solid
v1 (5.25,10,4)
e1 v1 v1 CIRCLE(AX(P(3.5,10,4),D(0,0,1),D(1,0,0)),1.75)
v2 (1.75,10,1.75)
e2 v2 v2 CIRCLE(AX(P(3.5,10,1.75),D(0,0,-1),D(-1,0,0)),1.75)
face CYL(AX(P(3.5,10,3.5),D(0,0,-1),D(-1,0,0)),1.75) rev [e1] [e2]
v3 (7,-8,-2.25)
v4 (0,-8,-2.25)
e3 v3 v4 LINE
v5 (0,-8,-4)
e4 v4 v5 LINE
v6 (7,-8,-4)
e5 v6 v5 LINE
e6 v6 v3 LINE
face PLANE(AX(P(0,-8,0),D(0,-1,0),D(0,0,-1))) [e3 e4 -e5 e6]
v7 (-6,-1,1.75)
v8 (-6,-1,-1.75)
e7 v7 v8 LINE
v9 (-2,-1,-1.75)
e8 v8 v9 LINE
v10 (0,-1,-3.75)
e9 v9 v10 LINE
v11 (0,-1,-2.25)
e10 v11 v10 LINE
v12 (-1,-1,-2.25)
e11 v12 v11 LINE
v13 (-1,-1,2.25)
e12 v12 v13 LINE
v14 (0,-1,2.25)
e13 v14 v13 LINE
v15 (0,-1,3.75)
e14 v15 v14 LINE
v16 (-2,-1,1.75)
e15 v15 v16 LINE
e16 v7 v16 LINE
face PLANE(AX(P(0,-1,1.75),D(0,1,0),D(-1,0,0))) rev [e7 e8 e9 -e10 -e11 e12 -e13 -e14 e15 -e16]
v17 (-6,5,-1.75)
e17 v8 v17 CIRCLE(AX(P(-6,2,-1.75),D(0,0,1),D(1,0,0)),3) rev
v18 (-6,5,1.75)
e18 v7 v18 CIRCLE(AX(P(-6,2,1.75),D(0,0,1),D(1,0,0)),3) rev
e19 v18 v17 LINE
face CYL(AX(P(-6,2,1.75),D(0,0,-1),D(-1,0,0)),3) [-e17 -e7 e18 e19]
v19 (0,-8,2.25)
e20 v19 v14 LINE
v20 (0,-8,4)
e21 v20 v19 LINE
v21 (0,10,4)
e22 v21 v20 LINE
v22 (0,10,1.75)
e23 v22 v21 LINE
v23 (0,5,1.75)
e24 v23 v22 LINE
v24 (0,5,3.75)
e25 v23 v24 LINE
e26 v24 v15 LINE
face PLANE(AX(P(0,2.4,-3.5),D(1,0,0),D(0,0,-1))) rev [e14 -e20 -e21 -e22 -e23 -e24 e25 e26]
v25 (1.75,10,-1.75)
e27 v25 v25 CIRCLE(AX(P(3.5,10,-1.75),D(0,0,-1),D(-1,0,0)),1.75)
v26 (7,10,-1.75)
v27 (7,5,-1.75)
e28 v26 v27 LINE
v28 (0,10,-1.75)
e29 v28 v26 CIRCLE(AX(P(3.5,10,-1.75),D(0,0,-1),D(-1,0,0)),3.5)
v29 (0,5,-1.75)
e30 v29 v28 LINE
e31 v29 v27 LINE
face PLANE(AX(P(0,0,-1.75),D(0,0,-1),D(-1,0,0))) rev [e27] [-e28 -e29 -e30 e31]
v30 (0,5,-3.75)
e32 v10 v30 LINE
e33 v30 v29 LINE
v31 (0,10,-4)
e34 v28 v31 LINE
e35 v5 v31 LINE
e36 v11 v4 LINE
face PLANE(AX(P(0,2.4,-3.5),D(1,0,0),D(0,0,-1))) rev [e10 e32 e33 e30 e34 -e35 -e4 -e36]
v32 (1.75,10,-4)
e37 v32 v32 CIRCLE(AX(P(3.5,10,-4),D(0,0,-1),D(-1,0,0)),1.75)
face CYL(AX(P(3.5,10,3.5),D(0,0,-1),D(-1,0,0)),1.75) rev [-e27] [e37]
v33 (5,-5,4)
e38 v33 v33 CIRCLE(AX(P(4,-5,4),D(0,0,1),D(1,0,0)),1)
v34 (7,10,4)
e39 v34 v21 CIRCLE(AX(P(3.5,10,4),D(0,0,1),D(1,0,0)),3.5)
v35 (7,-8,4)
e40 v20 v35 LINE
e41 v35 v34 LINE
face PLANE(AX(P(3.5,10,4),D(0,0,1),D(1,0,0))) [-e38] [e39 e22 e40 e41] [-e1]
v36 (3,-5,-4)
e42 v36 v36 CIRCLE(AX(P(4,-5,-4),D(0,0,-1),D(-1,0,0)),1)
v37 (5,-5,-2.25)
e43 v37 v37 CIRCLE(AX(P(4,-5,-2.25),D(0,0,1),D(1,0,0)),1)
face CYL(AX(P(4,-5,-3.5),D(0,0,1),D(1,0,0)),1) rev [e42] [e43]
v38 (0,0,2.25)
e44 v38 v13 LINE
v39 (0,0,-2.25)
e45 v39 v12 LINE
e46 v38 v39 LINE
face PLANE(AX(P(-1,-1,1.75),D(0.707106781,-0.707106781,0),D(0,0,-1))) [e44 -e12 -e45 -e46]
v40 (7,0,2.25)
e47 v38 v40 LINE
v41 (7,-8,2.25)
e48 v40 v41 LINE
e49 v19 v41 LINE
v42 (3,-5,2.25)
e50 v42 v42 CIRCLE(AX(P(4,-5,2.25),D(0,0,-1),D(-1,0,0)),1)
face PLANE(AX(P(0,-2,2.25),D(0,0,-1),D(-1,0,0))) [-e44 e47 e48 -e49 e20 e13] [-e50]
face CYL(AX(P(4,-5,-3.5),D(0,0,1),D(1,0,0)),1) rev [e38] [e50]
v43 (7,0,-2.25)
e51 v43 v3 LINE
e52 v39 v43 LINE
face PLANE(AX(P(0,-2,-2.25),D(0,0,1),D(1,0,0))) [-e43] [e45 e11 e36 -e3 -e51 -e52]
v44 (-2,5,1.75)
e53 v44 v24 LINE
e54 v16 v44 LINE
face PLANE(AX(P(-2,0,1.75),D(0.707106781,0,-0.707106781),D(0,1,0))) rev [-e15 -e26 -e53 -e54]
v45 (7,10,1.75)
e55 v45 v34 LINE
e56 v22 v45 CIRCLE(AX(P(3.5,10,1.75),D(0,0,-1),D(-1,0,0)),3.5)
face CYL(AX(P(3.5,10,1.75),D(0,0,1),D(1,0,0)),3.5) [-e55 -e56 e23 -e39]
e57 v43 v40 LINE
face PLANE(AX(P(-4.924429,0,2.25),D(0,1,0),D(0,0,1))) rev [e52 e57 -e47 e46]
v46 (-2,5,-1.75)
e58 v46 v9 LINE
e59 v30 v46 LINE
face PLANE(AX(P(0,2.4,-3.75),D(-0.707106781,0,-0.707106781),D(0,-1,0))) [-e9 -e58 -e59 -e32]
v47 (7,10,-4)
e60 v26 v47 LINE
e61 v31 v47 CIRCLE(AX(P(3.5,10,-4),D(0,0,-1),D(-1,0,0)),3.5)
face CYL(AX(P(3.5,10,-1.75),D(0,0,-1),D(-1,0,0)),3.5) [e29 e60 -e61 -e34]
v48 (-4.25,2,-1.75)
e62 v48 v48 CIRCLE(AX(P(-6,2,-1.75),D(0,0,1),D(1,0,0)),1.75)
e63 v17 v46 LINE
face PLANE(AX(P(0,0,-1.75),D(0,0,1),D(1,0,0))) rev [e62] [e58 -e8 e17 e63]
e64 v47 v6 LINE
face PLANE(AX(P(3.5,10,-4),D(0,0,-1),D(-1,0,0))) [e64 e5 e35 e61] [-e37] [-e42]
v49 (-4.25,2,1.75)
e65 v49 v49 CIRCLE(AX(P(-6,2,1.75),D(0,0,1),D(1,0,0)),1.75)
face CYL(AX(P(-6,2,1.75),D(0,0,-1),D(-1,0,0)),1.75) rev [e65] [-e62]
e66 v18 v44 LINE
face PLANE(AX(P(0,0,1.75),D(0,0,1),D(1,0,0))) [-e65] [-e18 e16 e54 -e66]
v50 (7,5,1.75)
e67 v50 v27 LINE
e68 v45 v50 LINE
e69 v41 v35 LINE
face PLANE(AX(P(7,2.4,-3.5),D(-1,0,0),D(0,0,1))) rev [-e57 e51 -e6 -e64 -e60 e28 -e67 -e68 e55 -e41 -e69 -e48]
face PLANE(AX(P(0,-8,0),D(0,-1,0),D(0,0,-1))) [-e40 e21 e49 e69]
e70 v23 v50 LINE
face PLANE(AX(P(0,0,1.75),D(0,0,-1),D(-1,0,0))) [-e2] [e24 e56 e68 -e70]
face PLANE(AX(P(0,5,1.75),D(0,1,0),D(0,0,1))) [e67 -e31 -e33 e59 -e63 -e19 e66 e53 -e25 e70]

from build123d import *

# Parameters (mm, degrees)
SKETCH_1_W          = 7
SKETCH_1_H          = 7
EXTRUDE_1_DEPTH     = 2.4
EXTRUDE_6_DEPTH     = 1.75
EXTRUDE_START       = -5.25
EXTRUDE_8_DEPTH     = 1.75
SKETCH_11_R         = 1.75
CUT_EXTRUDE_1_DEPTH = 17.740669043
SKETCH_17_W         = 7
SKETCH_17_H         = 7
EXTRUDE_10_DEPTH    = 8
SKETCH_15_R         = 1.75
EXTRUDE_9_DEPTH     = 1.75
SKETCH_12_R         = 1
CUT_EXTRUDE_2_DEPTH = 17.552945357
SKETCH_18_W         = 7
SKETCH_18_H         = 4.5
CUT_EXTRUDE_4_DEPTH = 6
SKETCH_19_R         = 1
SKETCH_19_R_2       = 1.75
EXTRUDE_11_DEPTH    = 0.5
EXTRUDE_START_2     = 0.5
SKETCH_20_R         = 1
SKETCH_20_R_2       = 1.75
EXTRUDE_12_DEPTH    = 0.5
SKETCH_22_W         = 4.5
SKETCH_22_H         = 2
CUT_EXTRUDE_5_DEPTH = 7
CHAMFER_1_SIZE      = 1
CHAMFER_START       = -8
CHAMFER_2_DEPTH     = 13
CHAMFER_START_2     = -1
CHAMFER_2_2_DEPTH   = 6
CHAMFER_START_3     = -2.25
CHAMFER_2_3_DEPTH   = 4.5
SKETCH_23_W         = 8
SKETCH_23_H         = 7
CUT_EXTRUDE_6_DEPTH = 17.710774967


with BuildPart() as part:
    # 草图1 → 凸台-拉伸1 (new body)
    with BuildSketch(Plane(origin=(0, 0, 0), x_dir=(1, 0, 0), z_dir=(0, 1, 0))):
        with Locations((3.5, 0)):
            Rectangle(SKETCH_1_W, SKETCH_1_H)
    extrude(amount=EXTRUDE_1_DEPTH)

    # 草图10 → 凸台-拉伸6 (add)
    with BuildSketch(Plane(origin=(0, 0, -3.5), x_dir=(-1, 0, 0), z_dir=(0, 0, -1))):
        with BuildLine():
            Line((0, 2.4), (0, 10))
            ThreePointArc((0, 10), (-3.5, 13.5), (-7, 10))
            Line((-7, 10), (-7, 2.4))
            Line((-7, 2.4), (0, 2.4))
        make_face()
    extrude(amount=-EXTRUDE_6_DEPTH)

    # 草图10<2> → 凸台-拉伸8 (add)
    with BuildSketch(Plane(origin=(0, 0, -3.5), x_dir=(-1, 0, 0), z_dir=(0, 0, -1)).offset(EXTRUDE_START)):
        with BuildLine():
            Line((0, 2.4), (0, 10))
            ThreePointArc((0, 10), (-3.5, 13.5), (-7, 10))
            Line((-7, 10), (-7, 2.4))
            Line((-7, 2.4), (0, 2.4))
        make_face()
    extrude(amount=-EXTRUDE_8_DEPTH)

    # 草图11 → 切除-拉伸1 (cut, through all)
    with BuildSketch(Plane(origin=(0, 0, -3.5), x_dir=(-1, 0, 0), z_dir=(0, 0, -1))):
        with Locations((-3.5, 10)):
            Circle(SKETCH_11_R)
    extrude(amount=-CUT_EXTRUDE_1_DEPTH, mode=Mode.SUBTRACT)

    # 草图17 → 凸台-拉伸10 (add)
    with BuildSketch(Plane.XZ):
        with Locations((3.5, 0)):
            Rectangle(SKETCH_17_W, SKETCH_17_H)
    extrude(amount=EXTRUDE_10_DEPTH)

    # 草图15 → 凸台-拉伸9 (add, symmetric)
    with BuildSketch(Plane.XY):
        with BuildLine():
            ThreePointArc((-6, -1), (-9, 2), (-6, 5))
            Line((-6, 5), (7, 5))
            Line((7, 5), (7, -1))
            Line((7, -1), (-6, -1))
        make_face()
        with Locations((-6, 2)):
            Circle(SKETCH_15_R, mode=Mode.SUBTRACT)
    extrude(amount=EXTRUDE_9_DEPTH, both=True)

    # 草图12 → 切除-拉伸2 (cut, through all)
    with BuildSketch(Plane(origin=(0, 4, 3.5), x_dir=(1, 0, 0), z_dir=(0, 0, -1))):
        with Locations(Location((4, 9, 0), (0, 0, 180))):
            Circle(SKETCH_12_R)
    extrude(amount=CUT_EXTRUDE_2_DEPTH, mode=Mode.SUBTRACT)

    # 草图18 → 切除-拉伸4 (cut)
    with BuildSketch(Plane(origin=(7.4, -8, 0), x_dir=(1, 0, 0), z_dir=(0, 1, 0))):
        with Locations((-3.9, 0)):
            Rectangle(SKETCH_18_W, SKETCH_18_H)
    extrude(amount=CUT_EXTRUDE_4_DEPTH, mode=Mode.SUBTRACT)

    # 草图19 → 凸台-拉伸11 (add)
    with BuildSketch(Plane.XY.offset(3.5)):
        with BuildLine():
            Line((0, 10), (0, -8))
            Line((0, -8), (7, -8))
            Line((7, -8), (7, 10))
            ThreePointArc((7, 10), (3.5, 13.5), (0, 10))
        make_face()
        with Locations((4, -5)):
            Circle(SKETCH_19_R, mode=Mode.SUBTRACT)
        with Locations(Location((3.5, 10, 0), (0, 0, 180))):
            Circle(SKETCH_19_R_2, mode=Mode.SUBTRACT)
    extrude(amount=EXTRUDE_11_DEPTH)

    # 草图20 → 凸台-拉伸12 (add)
    with BuildSketch(Plane(origin=(0, 0, -3.5), x_dir=(-1, 0, 0), z_dir=(0, 0, -1)).offset(EXTRUDE_START_2)):
        with BuildLine():
            Line((-7, 10), (-7, -8))
            Line((-7, -8), (0, -8))
            Line((0, -8), (0, 10))
            ThreePointArc((0, 10), (-3.5, 13.5), (-7, 10))
        make_face()
        with Locations(Location((-4, -5, 0), (0, 0, 180))):
            Circle(SKETCH_20_R, mode=Mode.SUBTRACT)
        with Locations((-3.5, 10)):
            Circle(SKETCH_20_R_2, mode=Mode.SUBTRACT)
    extrude(amount=-EXTRUDE_12_DEPTH)

    # 草图22 → 切除-拉伸5 (cut)
    with BuildSketch(Plane(origin=(7, 0, 0), x_dir=(0, 0, -1), z_dir=(1, 0, 0))):
        with Locations((0, -1)):
            Rectangle(SKETCH_22_W, SKETCH_22_H)
    extrude(amount=-CUT_EXTRUDE_5_DEPTH, mode=Mode.SUBTRACT)

    # 倒角1
    chamfer_1_edges = [part.edges().sort_by_distance(p)[0] for p in [
        (0, -1, 0),
    ]]
    chamfer(chamfer_1_edges, length=CHAMFER_1_SIZE - 0.0001)  # a hair under: the kernel refuses the full size

    # 倒角2: read off the stored shape, not the designer's step
    # 倒角2 outline → 倒角2 (add)
    with BuildSketch(Plane(origin=(0, 0, 0), x_dir=(1, 0, 0), z_dir=(0, 1, 0)).offset(CHAMFER_START)):
        Polygon((0, -3.75), (0, -2.25), (-1.5, -2.25), align=None)
        Polygon((0, 3.75), (-1.5, 2.25), (0, 2.25), align=None)
    extrude(amount=CHAMFER_2_DEPTH)

    # Chamfer 2 2 outline → Chamfer 2 2 (add)
    with BuildSketch(Plane(origin=(0, 0, 0), x_dir=(1, 0, 0), z_dir=(0, 1, 0)).offset(CHAMFER_START_2)):
        Polygon((-1.5, -2.25), (0, -2.25), (0, -1.75), (-2, -1.75), align=None)
        Polygon((0, 2.25), (-1.5, 2.25), (-2, 1.75), (0, 1.75), align=None)
    extrude(amount=CHAMFER_2_2_DEPTH)

    # Chamfer 2 3 outline → Chamfer 2 3 (cut)
    with BuildSketch(Plane.XY.offset(CHAMFER_START_3)):
        Polygon((0, 0), (-1, -1), (0, -1), align=None)
    extrude(amount=CHAMFER_2_3_DEPTH, mode=Mode.SUBTRACT)

    # 草图23 → 切除-拉伸6 (cut, through all)
    with BuildSketch(Plane.ZY):
        with Locations((0, -4.5)):
            Rectangle(SKETCH_23_W, SKETCH_23_H)
    extrude(amount=CUT_EXTRUDE_6_DEPTH, mode=Mode.SUBTRACT)


solid = part.part
